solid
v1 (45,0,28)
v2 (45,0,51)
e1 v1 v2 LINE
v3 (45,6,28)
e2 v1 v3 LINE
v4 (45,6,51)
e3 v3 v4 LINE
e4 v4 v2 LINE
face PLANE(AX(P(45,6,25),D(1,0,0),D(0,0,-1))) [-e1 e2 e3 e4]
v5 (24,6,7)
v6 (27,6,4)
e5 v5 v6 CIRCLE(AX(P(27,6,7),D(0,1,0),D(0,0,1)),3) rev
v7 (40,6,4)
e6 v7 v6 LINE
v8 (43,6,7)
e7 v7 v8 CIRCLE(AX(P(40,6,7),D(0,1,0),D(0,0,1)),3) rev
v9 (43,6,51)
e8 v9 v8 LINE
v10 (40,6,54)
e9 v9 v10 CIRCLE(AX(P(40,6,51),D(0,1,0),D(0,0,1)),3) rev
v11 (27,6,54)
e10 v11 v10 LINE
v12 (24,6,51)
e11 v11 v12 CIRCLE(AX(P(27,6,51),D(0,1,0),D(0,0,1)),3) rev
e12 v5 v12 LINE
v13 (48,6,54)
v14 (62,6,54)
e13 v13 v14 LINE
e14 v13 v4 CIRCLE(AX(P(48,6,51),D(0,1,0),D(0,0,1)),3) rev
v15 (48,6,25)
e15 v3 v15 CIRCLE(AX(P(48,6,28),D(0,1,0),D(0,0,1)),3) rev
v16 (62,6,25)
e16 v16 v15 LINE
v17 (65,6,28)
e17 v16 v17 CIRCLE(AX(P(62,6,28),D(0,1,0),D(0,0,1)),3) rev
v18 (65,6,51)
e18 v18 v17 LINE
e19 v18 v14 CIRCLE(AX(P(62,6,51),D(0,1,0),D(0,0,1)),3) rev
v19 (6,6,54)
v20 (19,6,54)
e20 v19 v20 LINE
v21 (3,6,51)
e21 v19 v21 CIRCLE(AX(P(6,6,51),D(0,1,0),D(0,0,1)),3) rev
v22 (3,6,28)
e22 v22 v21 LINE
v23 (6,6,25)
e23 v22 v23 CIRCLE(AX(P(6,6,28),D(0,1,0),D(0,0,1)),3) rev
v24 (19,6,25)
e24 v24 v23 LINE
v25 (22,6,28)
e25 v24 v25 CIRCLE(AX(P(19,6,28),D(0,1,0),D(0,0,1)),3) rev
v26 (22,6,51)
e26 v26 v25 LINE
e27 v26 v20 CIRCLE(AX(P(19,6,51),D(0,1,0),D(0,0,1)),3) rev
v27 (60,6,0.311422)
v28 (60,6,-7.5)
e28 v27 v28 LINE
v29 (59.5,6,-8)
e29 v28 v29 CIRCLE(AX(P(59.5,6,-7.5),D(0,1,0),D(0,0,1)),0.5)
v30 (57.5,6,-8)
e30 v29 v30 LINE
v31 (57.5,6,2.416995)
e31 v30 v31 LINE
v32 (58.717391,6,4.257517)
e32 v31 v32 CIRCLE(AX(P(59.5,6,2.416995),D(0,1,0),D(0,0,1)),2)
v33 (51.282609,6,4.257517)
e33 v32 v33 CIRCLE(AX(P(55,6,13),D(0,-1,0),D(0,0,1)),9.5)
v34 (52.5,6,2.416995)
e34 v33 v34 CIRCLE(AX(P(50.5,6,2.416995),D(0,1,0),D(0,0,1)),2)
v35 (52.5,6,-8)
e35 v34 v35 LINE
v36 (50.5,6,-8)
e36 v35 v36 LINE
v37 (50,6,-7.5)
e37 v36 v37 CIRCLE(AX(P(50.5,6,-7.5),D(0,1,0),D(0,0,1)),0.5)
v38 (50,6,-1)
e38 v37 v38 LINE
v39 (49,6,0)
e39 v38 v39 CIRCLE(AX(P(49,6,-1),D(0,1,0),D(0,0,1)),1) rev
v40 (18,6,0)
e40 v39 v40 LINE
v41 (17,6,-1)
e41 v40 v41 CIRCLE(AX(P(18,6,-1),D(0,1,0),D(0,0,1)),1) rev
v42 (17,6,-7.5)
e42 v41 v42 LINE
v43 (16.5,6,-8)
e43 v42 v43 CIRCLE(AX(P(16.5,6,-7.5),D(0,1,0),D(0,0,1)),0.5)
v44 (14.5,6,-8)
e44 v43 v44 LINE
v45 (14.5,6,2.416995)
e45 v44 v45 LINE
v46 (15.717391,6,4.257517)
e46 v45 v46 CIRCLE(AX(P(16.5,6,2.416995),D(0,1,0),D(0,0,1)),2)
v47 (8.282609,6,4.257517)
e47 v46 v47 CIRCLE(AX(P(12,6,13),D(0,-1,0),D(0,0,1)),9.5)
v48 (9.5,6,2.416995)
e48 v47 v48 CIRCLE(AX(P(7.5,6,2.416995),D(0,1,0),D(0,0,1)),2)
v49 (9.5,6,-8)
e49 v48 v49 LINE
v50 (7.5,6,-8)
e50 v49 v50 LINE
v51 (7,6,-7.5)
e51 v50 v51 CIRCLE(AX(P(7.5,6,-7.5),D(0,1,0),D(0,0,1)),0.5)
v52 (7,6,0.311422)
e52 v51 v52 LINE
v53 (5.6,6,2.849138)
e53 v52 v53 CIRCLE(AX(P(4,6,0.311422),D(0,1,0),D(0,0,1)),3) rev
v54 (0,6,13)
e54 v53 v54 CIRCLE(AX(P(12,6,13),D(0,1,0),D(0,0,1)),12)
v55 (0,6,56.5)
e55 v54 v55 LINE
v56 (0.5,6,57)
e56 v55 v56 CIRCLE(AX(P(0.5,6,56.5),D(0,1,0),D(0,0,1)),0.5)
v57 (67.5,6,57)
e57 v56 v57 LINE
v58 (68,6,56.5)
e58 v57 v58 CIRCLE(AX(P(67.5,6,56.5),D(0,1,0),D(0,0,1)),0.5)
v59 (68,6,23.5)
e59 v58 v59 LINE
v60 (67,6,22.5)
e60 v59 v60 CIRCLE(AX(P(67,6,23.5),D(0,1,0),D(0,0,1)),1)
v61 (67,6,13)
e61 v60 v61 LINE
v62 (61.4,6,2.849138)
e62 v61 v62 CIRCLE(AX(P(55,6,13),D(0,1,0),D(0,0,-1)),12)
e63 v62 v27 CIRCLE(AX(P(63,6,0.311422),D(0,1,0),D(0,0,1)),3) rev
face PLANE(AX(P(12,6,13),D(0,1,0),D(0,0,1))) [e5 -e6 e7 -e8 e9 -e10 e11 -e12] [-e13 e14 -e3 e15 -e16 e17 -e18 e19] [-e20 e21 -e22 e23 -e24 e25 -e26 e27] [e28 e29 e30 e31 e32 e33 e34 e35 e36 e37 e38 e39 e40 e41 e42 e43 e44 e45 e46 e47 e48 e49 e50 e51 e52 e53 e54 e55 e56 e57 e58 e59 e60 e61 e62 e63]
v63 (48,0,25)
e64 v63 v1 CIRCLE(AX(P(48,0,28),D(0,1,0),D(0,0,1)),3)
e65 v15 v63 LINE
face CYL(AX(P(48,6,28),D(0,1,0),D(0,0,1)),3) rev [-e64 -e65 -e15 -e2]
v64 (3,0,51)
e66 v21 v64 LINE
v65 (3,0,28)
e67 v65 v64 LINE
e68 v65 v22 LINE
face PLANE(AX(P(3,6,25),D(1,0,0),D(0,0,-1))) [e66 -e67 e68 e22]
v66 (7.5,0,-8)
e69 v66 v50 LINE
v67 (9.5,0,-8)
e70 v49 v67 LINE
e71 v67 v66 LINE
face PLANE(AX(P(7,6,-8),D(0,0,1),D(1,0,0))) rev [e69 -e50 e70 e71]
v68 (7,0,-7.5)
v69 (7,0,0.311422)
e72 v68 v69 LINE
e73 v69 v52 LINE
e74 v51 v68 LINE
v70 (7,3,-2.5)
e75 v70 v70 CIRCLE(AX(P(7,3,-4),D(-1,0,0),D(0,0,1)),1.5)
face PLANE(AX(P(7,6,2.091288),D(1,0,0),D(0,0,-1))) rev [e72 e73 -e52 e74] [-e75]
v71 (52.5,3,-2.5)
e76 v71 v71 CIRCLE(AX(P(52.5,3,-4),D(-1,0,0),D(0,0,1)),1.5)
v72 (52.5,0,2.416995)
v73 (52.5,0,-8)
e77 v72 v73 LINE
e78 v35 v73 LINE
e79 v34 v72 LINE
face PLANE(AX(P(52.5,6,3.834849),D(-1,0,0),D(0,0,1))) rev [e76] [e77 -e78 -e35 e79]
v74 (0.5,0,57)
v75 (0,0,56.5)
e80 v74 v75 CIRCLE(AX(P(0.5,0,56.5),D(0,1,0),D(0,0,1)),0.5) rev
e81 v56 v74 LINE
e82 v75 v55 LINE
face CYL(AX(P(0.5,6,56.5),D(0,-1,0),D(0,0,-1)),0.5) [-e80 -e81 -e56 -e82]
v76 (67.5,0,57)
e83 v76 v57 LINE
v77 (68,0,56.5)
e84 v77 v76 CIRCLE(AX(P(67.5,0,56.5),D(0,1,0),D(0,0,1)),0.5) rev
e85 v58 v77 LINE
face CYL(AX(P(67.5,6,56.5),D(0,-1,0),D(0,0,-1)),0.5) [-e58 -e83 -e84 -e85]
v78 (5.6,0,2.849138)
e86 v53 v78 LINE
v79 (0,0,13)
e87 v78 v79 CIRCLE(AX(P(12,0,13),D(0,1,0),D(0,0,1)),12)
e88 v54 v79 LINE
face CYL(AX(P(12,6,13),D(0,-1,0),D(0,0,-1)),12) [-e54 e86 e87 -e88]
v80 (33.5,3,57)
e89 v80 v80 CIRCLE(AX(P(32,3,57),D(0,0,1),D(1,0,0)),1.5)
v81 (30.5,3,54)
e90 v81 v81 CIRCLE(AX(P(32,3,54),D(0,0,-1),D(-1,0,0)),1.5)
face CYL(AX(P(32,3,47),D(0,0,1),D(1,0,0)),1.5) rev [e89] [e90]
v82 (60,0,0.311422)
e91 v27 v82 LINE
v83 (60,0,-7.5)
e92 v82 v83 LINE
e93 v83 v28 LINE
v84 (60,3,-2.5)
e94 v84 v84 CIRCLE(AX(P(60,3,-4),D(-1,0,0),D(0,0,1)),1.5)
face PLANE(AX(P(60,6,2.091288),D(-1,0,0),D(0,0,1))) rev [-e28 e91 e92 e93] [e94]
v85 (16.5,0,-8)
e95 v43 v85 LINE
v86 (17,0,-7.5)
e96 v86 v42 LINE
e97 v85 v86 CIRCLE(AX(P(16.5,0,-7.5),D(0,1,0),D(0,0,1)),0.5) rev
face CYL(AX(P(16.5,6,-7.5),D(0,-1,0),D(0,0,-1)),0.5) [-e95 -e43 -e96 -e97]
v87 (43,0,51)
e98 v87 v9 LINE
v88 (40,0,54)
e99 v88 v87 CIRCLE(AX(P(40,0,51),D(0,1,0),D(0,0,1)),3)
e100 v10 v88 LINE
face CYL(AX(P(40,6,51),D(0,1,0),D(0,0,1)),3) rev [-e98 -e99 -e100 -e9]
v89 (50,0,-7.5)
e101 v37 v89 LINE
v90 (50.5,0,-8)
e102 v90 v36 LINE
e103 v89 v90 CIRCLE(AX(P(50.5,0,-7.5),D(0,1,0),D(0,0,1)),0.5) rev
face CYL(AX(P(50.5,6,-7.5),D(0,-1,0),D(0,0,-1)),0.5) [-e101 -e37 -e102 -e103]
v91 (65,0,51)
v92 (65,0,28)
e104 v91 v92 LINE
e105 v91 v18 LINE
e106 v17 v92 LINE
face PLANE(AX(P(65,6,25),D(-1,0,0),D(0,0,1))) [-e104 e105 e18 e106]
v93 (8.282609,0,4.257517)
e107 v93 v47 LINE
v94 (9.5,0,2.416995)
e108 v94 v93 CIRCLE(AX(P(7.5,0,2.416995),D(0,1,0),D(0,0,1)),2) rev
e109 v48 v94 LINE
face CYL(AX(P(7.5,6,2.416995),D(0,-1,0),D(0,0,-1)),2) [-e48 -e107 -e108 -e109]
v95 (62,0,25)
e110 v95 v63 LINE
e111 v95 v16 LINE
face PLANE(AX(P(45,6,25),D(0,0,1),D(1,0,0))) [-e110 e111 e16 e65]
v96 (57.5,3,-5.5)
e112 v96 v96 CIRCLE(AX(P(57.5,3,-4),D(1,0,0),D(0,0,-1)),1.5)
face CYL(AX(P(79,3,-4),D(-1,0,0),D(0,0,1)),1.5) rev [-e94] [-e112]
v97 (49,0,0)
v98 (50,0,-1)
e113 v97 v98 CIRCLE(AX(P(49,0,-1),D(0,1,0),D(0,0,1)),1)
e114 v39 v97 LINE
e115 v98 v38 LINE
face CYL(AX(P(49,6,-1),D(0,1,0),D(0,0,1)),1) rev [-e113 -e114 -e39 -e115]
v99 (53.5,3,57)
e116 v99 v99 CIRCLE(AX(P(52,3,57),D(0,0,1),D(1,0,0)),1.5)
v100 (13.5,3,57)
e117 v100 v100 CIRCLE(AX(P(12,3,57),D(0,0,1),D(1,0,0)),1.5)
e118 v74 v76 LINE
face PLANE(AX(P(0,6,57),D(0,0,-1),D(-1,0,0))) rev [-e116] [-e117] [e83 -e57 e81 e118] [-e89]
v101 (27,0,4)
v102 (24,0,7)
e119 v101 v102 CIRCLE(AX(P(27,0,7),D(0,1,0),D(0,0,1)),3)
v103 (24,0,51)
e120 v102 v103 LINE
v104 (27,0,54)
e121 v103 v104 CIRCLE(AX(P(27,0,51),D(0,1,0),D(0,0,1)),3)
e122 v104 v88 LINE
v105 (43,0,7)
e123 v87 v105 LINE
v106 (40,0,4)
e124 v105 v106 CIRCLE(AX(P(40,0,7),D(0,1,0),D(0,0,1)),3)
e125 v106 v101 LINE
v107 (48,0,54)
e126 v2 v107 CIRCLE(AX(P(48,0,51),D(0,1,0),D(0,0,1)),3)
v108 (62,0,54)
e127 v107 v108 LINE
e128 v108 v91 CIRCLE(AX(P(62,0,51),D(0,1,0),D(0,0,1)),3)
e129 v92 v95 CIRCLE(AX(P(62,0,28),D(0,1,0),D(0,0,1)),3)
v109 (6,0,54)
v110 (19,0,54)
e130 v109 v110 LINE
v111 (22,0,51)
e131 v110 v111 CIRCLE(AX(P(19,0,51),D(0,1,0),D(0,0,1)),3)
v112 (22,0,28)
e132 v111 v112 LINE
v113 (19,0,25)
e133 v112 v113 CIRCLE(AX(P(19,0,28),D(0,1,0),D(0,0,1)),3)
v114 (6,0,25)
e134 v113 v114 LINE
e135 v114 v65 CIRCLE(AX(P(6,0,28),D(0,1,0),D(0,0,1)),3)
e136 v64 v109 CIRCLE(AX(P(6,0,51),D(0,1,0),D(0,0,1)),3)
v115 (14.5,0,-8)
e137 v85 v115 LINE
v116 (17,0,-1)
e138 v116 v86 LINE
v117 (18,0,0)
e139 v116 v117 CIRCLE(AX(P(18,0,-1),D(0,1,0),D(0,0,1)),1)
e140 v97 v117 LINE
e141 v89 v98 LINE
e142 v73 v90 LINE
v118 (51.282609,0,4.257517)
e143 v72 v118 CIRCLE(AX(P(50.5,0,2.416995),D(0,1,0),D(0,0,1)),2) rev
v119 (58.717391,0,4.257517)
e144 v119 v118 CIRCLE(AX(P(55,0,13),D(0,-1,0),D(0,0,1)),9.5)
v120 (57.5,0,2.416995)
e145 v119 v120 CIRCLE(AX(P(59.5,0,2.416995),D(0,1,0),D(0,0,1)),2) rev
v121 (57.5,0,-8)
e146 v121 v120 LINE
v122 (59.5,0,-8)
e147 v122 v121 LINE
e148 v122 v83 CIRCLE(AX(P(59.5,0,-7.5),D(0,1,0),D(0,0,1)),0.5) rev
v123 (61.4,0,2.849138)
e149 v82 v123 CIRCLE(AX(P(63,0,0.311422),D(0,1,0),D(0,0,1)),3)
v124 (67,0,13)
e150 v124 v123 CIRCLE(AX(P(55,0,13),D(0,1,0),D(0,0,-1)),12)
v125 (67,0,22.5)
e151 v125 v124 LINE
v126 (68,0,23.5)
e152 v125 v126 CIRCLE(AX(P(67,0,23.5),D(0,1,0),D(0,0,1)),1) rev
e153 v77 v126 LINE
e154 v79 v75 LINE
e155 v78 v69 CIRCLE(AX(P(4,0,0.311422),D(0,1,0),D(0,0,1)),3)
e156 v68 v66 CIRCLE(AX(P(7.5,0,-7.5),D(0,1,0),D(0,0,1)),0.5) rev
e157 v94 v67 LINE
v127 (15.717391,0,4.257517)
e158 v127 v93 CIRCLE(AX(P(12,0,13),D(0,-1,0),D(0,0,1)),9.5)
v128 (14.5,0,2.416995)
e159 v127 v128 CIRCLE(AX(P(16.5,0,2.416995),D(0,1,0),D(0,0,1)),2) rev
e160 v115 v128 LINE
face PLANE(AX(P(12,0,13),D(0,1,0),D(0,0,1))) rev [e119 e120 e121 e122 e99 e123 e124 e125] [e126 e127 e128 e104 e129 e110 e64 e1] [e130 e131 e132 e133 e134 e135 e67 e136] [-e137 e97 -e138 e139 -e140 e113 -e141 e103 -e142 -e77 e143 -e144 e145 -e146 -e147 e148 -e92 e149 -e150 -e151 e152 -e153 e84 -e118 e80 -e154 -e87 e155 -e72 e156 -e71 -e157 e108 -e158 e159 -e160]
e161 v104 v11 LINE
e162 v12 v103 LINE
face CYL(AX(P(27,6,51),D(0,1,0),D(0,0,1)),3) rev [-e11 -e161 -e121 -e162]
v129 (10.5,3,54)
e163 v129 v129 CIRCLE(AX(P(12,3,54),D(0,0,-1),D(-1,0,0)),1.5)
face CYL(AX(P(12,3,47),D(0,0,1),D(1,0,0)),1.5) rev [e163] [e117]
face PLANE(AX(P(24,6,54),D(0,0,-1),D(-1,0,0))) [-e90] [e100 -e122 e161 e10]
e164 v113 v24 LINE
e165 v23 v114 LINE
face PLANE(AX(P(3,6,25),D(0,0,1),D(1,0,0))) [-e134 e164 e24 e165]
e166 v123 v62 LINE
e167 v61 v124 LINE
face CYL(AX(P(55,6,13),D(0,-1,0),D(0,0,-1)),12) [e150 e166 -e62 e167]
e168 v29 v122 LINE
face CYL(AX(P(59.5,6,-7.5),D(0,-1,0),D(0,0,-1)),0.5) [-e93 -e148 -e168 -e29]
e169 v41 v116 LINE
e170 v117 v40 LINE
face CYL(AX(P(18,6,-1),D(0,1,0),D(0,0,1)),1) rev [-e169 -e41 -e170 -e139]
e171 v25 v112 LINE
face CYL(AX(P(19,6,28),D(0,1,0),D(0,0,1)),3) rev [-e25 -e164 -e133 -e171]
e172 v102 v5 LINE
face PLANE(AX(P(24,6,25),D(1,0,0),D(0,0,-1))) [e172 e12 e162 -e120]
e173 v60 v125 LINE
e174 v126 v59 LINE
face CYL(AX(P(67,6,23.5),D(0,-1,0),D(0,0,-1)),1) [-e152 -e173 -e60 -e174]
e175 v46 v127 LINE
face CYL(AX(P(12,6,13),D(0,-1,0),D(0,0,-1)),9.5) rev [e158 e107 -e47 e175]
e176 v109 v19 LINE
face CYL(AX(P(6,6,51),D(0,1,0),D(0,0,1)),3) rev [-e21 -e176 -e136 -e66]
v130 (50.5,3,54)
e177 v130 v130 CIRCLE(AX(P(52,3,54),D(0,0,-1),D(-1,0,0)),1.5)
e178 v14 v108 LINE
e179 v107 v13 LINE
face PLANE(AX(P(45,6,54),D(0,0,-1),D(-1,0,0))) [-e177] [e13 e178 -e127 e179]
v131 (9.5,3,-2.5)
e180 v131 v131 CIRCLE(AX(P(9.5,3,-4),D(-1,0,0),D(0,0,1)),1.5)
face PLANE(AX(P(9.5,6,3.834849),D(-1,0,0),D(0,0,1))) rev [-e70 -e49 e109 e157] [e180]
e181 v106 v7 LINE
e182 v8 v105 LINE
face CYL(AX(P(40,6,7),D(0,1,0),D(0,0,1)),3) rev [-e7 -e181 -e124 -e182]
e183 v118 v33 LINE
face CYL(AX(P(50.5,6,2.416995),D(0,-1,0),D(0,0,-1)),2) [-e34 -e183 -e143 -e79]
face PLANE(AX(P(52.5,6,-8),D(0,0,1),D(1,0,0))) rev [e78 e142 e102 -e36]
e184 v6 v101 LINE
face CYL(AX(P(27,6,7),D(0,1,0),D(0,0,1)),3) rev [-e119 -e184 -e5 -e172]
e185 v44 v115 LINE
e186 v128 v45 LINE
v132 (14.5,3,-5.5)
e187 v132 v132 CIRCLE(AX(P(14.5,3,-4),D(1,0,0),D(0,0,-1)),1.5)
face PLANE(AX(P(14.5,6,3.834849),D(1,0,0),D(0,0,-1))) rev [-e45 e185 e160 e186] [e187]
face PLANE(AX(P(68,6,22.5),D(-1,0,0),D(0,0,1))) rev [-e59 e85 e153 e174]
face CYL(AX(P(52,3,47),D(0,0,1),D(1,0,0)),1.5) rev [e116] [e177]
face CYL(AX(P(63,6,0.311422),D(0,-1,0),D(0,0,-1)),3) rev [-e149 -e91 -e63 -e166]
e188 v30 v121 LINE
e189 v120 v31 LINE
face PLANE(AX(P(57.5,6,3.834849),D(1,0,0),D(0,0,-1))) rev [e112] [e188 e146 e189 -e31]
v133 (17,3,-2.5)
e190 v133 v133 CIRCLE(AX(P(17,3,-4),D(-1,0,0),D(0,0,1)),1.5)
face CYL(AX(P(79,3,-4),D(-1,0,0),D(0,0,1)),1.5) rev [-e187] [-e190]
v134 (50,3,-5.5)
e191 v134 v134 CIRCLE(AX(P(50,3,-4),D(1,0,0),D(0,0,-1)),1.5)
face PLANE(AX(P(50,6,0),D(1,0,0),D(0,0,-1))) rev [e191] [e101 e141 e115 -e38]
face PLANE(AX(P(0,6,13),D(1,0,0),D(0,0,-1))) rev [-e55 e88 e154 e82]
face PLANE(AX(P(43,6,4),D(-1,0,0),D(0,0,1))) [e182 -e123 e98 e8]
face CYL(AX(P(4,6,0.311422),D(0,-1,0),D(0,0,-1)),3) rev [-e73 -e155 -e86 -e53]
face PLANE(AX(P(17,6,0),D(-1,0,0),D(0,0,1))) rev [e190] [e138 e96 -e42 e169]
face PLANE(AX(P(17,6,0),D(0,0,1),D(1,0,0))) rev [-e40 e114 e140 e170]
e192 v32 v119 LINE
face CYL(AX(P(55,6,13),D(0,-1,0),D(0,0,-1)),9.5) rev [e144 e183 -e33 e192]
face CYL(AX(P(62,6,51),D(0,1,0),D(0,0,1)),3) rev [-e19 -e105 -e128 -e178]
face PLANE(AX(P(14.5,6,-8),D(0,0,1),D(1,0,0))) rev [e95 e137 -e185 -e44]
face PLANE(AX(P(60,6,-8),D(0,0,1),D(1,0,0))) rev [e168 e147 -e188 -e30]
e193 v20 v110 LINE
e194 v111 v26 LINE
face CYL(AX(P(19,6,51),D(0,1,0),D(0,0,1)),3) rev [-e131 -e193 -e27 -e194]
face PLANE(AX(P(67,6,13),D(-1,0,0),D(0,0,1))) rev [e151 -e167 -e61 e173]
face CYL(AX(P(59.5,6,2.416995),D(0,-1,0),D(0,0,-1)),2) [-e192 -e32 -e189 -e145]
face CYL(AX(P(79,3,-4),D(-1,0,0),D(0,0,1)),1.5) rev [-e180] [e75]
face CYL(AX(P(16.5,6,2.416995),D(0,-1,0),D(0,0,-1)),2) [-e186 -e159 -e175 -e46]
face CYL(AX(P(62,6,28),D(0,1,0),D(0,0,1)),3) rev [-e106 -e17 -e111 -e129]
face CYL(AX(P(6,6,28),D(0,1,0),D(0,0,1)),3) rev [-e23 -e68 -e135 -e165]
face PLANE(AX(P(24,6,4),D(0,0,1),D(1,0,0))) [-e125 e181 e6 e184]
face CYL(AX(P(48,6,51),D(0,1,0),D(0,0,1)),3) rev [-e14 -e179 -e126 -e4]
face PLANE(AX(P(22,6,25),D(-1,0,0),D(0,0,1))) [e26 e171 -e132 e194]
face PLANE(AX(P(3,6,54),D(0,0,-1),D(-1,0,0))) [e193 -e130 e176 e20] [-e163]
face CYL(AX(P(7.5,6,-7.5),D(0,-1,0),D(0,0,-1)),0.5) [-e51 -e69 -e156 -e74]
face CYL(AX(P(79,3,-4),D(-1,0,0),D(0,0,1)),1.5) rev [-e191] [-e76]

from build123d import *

# Parameters (mm, degrees)
SKETCH_1_W          = 19
SKETCH_1_H          = 29
SKETCH_1_W_2        = 20
EXTRUDE_1_DEPTH     = 6
SKETCH_3_R          = 1.5
CUT_EXTRUDE_1_DEPTH = 10
FILLET_1_R          = 3
FILLET_2_R          = 1
SKETCH_4_R          = 1.5
CUT_EXTRUDE_2_DEPTH = 72
FILLET_3_R          = 0.5
FILLET_4_R          = 0.5
FILLET_5_R          = 3
FILLET_6_R          = 2


with BuildPart() as part:
    # 草图1 → 凸台-拉伸1 (new body)
    with BuildSketch(Plane(origin=(0, 0, 0), x_dir=(1, 0, 0), z_dir=(0, 1, 0))):
        with BuildLine():
            Line((17, 0), (50, 0))
            Line((50, 0), (50, 8))
            Line((50, 8), (52.5, 8))
            Line((52.5, 8), (52.5, -3.83484861))
            ThreePointArc((52.5, -3.83484861), (55, -22.5), (57.5, -3.83484861))
            Line((57.5, -3.83484861), (57.5, 8))
            Line((57.5, 8), (60, 8))
            Line((60, 8), (60, -2.091287885))
            ThreePointArc((60, -2.091287885), (65.099504938, -6.519259302), (67, -13))
            Line((67, -13), (67, -22.5))
            Line((67, -22.5), (68, -22.5))
            Line((68, -22.5), (68, -57))
            Line((68, -57), (0, -57))
            Line((0, -57), (0, -13))
            ThreePointArc((0, -13), (1.900495062, -6.519259302), (7, -2.091287885))
            Line((7, -2.091287885), (7, 8))
            Line((7, 8), (9.5, 8))
            Line((9.5, 8), (9.5, -3.83484861))
            ThreePointArc((9.5, -3.83484861), (12, -22.5), (14.5, -3.83484861))
            Line((14.5, -3.83484861), (14.5, 8))
            Line((14.5, 8), (17, 8))
            Line((17, 8), (17, 0))
        make_face()
        with Locations((12.5, -39.5)):
            Rectangle(SKETCH_1_W, SKETCH_1_H, mode=Mode.SUBTRACT)
        Polygon((24, -25), (24, -54), (43, -54), (43, -25), (43, -4), (24, -4), align=None, mode=Mode.SUBTRACT)
        with Locations((55, -39.5)):
            Rectangle(SKETCH_1_W_2, SKETCH_1_H, mode=Mode.SUBTRACT)
    extrude(amount=EXTRUDE_1_DEPTH)

    # 草图3 → 切除-拉伸1 (cut)
    with BuildSketch(Plane.XY.offset(57)):
        with Locations((12, 3)):
            Circle(SKETCH_3_R)
        with Locations((32, 3)):
            Circle(SKETCH_3_R)
        with Locations((52, 3)):
            Circle(SKETCH_3_R)
    extrude(amount=-CUT_EXTRUDE_1_DEPTH, mode=Mode.SUBTRACT)

    # 圆角1
    fillet_1_edges = [part.edges().sort_by_distance(p)[0] for p in [
        (22, 3, 25),
        (3, 3, 25),
        (3, 3, 54),
        (22, 3, 54),
        (24, 3, 4),
        (24, 3, 54),
        (43, 3, 54),
        (43, 3, 4),
        (45, 3, 54),
        (65, 3, 54),
        (65, 3, 25),
        (45, 3, 25),
    ]]
    fillet(fillet_1_edges, radius=FILLET_1_R)

    # 圆角2
    fillet_2_edges = [part.edges().sort_by_distance(p)[0] for p in [
        (50, 3, 0),
        (17, 3, 0),
        (68, 3, 22.5),
    ]]
    fillet(fillet_2_edges, radius=FILLET_2_R - 0.0001)  # a hair under: the kernel refuses the full size

    # 草图4 → 切除-拉伸2 (cut)
    with BuildSketch(Plane.ZY.offset(-7)):
        with Locations((-4, 3)):
            Circle(SKETCH_4_R)
    extrude(amount=-CUT_EXTRUDE_2_DEPTH, mode=Mode.SUBTRACT)

    # 圆角3
    fillet_3_edges = [part.edges().sort_by_distance(p)[0] for p in [
        (68, 3, 57),
        (0, 3, 57),
    ]]
    fillet(fillet_3_edges, radius=FILLET_3_R)

    # 圆角4
    fillet_4_edges = [part.edges().sort_by_distance(p)[0] for p in [
        (7, 3, -8),
        (17, 3, -8),
        (50, 3, -8),
        (60, 3, -8),
    ]]
    fillet(fillet_4_edges, radius=FILLET_4_R)

    # 圆角5
    fillet_5_edges = [part.edges().sort_by_distance(p)[0] for p in [
        (7, 3, 2.091287885),
        (60, 3, 2.091287885),
    ]]
    fillet(fillet_5_edges, radius=FILLET_5_R)

    # 圆角6
    fillet_6_edges = [part.edges().sort_by_distance(p)[0] for p in [
        (9.5, 3, 3.83484861),
        (14.5, 3, 3.83484861),
        (52.5, 3, 3.83484861),
        (57.5, 3, 3.83484861),
    ]]
    fillet(fillet_6_edges, radius=FILLET_6_R)


solid = part.part
